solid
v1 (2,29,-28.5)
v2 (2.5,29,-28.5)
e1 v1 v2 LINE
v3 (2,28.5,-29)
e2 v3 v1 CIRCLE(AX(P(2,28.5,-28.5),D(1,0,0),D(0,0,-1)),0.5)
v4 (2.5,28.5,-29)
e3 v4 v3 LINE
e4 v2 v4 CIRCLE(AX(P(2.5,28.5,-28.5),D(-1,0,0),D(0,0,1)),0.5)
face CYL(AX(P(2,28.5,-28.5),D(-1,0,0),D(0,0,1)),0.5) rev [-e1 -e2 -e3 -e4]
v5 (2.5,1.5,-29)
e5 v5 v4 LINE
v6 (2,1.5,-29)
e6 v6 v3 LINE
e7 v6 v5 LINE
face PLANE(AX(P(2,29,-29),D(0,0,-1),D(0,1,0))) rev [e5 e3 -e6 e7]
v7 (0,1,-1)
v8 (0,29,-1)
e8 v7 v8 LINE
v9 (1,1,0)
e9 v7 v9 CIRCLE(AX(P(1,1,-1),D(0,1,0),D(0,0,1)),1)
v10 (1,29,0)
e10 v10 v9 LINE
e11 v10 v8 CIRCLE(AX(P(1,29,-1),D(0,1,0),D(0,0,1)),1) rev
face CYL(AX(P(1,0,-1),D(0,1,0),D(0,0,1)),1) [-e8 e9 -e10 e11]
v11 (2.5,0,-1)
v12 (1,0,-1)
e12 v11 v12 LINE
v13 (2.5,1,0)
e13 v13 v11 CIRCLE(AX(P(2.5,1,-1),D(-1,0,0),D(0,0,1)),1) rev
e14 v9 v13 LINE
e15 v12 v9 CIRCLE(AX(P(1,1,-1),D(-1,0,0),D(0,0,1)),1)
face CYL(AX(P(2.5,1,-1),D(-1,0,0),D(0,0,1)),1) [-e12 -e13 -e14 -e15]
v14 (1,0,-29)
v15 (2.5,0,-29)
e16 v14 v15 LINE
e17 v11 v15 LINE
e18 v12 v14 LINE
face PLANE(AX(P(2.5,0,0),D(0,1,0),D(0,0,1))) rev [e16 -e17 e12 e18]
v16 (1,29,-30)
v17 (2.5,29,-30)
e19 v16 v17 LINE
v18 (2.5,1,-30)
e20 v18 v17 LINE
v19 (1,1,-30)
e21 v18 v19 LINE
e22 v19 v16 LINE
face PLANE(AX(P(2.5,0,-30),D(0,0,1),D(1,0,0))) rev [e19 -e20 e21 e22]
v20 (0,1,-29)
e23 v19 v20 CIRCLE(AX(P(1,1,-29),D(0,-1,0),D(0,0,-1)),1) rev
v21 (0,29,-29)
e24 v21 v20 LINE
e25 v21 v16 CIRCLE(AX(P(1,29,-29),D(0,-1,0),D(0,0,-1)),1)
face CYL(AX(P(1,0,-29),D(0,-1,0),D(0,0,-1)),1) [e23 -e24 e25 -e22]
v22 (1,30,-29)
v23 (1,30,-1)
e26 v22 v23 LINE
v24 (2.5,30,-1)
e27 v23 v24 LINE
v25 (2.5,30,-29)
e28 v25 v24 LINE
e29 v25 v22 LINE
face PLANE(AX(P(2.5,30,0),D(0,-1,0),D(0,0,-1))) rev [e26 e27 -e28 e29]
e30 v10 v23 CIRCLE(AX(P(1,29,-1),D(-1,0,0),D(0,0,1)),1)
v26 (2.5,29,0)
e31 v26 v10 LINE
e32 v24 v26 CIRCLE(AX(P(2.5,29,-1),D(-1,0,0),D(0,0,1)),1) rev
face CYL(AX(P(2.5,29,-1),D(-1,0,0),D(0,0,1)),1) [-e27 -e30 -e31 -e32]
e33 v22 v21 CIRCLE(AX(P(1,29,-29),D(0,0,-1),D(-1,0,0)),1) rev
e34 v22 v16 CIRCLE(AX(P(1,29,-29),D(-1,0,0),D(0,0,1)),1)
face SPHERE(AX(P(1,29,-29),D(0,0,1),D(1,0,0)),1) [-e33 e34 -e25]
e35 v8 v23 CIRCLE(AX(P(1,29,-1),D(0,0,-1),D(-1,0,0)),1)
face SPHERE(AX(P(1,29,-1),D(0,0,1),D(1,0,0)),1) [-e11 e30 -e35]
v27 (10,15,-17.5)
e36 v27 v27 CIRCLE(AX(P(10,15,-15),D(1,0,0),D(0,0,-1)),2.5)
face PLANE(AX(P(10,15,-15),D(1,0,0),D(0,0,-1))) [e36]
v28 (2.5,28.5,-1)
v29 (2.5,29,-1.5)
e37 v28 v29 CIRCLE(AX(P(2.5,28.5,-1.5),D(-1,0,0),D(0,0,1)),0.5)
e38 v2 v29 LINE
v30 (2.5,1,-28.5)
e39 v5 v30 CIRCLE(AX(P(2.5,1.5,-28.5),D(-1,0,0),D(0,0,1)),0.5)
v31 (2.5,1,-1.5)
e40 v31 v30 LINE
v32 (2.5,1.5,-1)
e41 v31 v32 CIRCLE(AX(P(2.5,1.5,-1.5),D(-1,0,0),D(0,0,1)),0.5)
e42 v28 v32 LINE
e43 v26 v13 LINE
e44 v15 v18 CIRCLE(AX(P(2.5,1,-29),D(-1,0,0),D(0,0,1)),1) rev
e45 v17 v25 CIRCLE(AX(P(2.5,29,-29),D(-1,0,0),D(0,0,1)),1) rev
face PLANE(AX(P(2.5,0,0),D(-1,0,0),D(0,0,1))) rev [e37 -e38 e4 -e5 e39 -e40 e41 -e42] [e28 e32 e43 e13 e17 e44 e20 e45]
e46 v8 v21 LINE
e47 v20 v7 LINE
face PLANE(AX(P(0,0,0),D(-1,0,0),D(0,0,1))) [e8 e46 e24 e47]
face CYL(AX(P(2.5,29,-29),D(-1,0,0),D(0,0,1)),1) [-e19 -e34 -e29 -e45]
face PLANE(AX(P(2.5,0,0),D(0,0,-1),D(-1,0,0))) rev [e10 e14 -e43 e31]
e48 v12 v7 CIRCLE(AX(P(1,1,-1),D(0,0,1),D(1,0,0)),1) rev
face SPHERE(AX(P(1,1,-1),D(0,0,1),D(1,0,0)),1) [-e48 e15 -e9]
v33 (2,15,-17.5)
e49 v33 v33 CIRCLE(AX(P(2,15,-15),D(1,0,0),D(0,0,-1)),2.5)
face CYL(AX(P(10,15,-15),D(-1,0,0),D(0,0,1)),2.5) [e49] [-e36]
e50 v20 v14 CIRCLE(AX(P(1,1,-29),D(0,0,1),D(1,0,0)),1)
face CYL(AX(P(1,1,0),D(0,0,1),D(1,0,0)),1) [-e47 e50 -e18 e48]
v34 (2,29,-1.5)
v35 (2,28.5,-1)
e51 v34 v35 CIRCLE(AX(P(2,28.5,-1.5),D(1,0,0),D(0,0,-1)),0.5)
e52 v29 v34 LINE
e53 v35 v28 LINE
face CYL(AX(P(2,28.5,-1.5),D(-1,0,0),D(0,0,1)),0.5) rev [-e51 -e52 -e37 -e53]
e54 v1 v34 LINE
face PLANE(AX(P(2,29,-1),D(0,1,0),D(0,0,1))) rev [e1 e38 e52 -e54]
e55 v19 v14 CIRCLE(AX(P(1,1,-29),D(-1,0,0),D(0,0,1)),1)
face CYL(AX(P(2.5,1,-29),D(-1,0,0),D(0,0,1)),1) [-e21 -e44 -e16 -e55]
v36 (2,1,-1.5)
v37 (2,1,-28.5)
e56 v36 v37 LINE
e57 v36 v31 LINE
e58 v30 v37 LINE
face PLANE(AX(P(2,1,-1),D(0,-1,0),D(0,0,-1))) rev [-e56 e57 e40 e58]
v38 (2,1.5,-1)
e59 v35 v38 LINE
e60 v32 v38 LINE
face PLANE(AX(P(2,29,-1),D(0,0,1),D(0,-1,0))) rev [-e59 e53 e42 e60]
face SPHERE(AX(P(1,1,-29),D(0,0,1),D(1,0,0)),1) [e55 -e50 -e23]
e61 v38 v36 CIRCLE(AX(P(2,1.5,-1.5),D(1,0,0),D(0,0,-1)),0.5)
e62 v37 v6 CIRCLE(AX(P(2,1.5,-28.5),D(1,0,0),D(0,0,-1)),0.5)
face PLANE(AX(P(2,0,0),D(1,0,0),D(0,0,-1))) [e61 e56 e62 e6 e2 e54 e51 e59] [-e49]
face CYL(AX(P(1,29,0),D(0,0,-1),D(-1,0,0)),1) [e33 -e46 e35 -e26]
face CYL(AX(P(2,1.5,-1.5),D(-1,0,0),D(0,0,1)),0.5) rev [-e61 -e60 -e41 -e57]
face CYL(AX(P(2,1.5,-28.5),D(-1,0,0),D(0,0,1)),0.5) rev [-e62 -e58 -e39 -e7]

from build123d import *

# Parameters (mm, degrees)
SKETCH2_W           = 30
SKETCH2_H           = 30
BOSS_EXTRUDE1_DEPTH = 2.5
SKETCH3_W           = 28
SKETCH3_H           = 28
CUT_EXTRUDE1_DEPTH  = 0.5
FILLET1_R           = 1
FILLET2_R           = 1
FILLET3_R           = 0.5
SKETCH5_R           = 2.5
BOSS_EXTRUDE2_DEPTH = 8


with BuildPart() as part:
    # Sketch2 → Boss-Extrude1 (new body)
    with BuildSketch(Plane(origin=(0, 0, 0), x_dir=(0, 0, -1), z_dir=(1, 0, 0))):
        with Locations((15, 15)):
            Rectangle(SKETCH2_W, SKETCH2_H)
    extrude(amount=BOSS_EXTRUDE1_DEPTH)

    # Sketch3 → Cut-Extrude1 (cut)
    with BuildSketch(Plane(origin=(2.5, 0, 0), x_dir=(0, 0, -1), z_dir=(1, 0, 0))):
        with Locations((15, 15)):
            Rectangle(SKETCH3_W, SKETCH3_H)
    extrude(amount=-CUT_EXTRUDE1_DEPTH, mode=Mode.SUBTRACT)

    # Fillet1
    fillet1_edges = [part.edges().sort_by_distance(p)[0] for p in [
        (0, 30, -15),
        (0, 15, -30),
        (0, 0, -15),
        (0, 15, 0),
    ]]
    fillet(fillet1_edges, radius=FILLET1_R)

    # Fillet2
    # the kernel refuses this fillet: 1 mm, written as the material it takes off along each edge
    with BuildSketch(Plane(origin=(1, 29, -1), x_dir=(0, 1, 0), z_dir=(0, 0, 1))) as fillet2_piece_1_section:
        Polygon((0, 0), (FILLET2_R, 0), (FILLET2_R, FILLET2_R), (0, FILLET2_R), align=None)
    fillet2_piece_1 = extrude(amount=FILLET2_R, mode=Mode.PRIVATE)
    fillet2_piece_1 = fillet2_piece_1 - Plane(origin=(1, 29, -1), x_dir=(0.7071067811865475, -0.7071067811865475, 0), z_dir=(0, 0, 1)) * Sphere(FILLET2_R, mode=Mode.PRIVATE)
    add(fillet2_piece_1, mode=Mode.SUBTRACT)
    with BuildSketch(Plane(origin=(1, 29, -29), x_dir=(0, 1, 0), z_dir=(0, 0, -1))) as fillet2_piece_2_section:
        Polygon((0, 0), (FILLET2_R, 0), (FILLET2_R, -FILLET2_R), (0, -FILLET2_R), align=None)
    fillet2_piece_2 = extrude(amount=FILLET2_R, mode=Mode.PRIVATE)
    fillet2_piece_2 = fillet2_piece_2 - Plane(origin=(1, 29, -29), x_dir=(0.7071067811865475, -0.7071067811865475, 0), z_dir=(0, 0, -1)) * Sphere(FILLET2_R, mode=Mode.PRIVATE)
    add(fillet2_piece_2, mode=Mode.SUBTRACT)
    with BuildSketch(Plane(origin=(1, 1, -1), x_dir=(0, 0, 1), z_dir=(0, -1, 0))) as fillet2_piece_3_section:
        Polygon((0, 0), (FILLET2_R, 0), (FILLET2_R, FILLET2_R), (0, FILLET2_R), align=None)
    fillet2_piece_3 = extrude(amount=FILLET2_R, mode=Mode.PRIVATE)
    fillet2_piece_3 = fillet2_piece_3 - Plane(origin=(1, 1, -1), x_dir=(0.7071067811865475, 0, -0.7071067811865475), z_dir=(0, -1, 0)) * Sphere(FILLET2_R, mode=Mode.PRIVATE)
    add(fillet2_piece_3, mode=Mode.SUBTRACT)
    with BuildSketch(Plane(origin=(1, 1, -29), x_dir=(0, 0, -1), z_dir=(0, -1, 0))) as fillet2_piece_4_section:
        Polygon((0, 0), (FILLET2_R, 0), (FILLET2_R, -FILLET2_R), (0, -FILLET2_R), align=None)
    fillet2_piece_4 = extrude(amount=FILLET2_R, mode=Mode.PRIVATE)
    fillet2_piece_4 = fillet2_piece_4 - Plane(origin=(1, 1, -29), x_dir=(0.7071067811865475, 0, 0.7071067811865475), z_dir=(0, -1, 0)) * Sphere(FILLET2_R, mode=Mode.PRIVATE)
    add(fillet2_piece_4, mode=Mode.SUBTRACT)
    with BuildSketch(Plane(origin=(1, 30, 0), x_dir=(0, -1, 0), z_dir=(1, 0, 0)), Plane(origin=(1, 0, 0), x_dir=(0, 0, -1), z_dir=(1, 0, 0))) as fillet2_piece_5:
        with BuildLine():
            CenterArc((FILLET2_R, FILLET2_R), FILLET2_R, 180, 90)
            Line((0, FILLET2_R), (0, 0))
            Line((0, 0), (FILLET2_R, 0))
        make_face()
    extrude(amount=4, mode=Mode.SUBTRACT)
    with BuildSketch(Plane(origin=(1, 30, -30), x_dir=(0, -1, 0), z_dir=(1, 0, 0)), Plane(origin=(1, 0, -30), x_dir=(0, 0, 1), z_dir=(1, 0, 0))) as fillet2_piece_6:
        with BuildLine():
            CenterArc((FILLET2_R, -FILLET2_R), FILLET2_R, 90, 90)
            Line((0, -FILLET2_R), (0, 0))
            Line((0, 0), (FILLET2_R, 0))
        make_face()
    extrude(amount=4, mode=Mode.SUBTRACT)

    # Fillet3
    fillet3_edges = [part.edges().sort_by_distance(p)[0] for p in [
        (2.25, 1, -1),
        (2.25, 29, -1),
        (2.25, 29, -29),
        (2.25, 1, -29),
    ]]
    fillet(fillet3_edges, radius=FILLET3_R)

    # Sketch5 → Boss-Extrude2 (add)
    with BuildSketch(Plane(origin=(2, 0, 0), x_dir=(0, 0, -1), z_dir=(1, 0, 0))):
        with Locations((15, 15)):
            Circle(SKETCH5_R)
    extrude(amount=BOSS_EXTRUDE2_DEPTH)


solid = part.part
